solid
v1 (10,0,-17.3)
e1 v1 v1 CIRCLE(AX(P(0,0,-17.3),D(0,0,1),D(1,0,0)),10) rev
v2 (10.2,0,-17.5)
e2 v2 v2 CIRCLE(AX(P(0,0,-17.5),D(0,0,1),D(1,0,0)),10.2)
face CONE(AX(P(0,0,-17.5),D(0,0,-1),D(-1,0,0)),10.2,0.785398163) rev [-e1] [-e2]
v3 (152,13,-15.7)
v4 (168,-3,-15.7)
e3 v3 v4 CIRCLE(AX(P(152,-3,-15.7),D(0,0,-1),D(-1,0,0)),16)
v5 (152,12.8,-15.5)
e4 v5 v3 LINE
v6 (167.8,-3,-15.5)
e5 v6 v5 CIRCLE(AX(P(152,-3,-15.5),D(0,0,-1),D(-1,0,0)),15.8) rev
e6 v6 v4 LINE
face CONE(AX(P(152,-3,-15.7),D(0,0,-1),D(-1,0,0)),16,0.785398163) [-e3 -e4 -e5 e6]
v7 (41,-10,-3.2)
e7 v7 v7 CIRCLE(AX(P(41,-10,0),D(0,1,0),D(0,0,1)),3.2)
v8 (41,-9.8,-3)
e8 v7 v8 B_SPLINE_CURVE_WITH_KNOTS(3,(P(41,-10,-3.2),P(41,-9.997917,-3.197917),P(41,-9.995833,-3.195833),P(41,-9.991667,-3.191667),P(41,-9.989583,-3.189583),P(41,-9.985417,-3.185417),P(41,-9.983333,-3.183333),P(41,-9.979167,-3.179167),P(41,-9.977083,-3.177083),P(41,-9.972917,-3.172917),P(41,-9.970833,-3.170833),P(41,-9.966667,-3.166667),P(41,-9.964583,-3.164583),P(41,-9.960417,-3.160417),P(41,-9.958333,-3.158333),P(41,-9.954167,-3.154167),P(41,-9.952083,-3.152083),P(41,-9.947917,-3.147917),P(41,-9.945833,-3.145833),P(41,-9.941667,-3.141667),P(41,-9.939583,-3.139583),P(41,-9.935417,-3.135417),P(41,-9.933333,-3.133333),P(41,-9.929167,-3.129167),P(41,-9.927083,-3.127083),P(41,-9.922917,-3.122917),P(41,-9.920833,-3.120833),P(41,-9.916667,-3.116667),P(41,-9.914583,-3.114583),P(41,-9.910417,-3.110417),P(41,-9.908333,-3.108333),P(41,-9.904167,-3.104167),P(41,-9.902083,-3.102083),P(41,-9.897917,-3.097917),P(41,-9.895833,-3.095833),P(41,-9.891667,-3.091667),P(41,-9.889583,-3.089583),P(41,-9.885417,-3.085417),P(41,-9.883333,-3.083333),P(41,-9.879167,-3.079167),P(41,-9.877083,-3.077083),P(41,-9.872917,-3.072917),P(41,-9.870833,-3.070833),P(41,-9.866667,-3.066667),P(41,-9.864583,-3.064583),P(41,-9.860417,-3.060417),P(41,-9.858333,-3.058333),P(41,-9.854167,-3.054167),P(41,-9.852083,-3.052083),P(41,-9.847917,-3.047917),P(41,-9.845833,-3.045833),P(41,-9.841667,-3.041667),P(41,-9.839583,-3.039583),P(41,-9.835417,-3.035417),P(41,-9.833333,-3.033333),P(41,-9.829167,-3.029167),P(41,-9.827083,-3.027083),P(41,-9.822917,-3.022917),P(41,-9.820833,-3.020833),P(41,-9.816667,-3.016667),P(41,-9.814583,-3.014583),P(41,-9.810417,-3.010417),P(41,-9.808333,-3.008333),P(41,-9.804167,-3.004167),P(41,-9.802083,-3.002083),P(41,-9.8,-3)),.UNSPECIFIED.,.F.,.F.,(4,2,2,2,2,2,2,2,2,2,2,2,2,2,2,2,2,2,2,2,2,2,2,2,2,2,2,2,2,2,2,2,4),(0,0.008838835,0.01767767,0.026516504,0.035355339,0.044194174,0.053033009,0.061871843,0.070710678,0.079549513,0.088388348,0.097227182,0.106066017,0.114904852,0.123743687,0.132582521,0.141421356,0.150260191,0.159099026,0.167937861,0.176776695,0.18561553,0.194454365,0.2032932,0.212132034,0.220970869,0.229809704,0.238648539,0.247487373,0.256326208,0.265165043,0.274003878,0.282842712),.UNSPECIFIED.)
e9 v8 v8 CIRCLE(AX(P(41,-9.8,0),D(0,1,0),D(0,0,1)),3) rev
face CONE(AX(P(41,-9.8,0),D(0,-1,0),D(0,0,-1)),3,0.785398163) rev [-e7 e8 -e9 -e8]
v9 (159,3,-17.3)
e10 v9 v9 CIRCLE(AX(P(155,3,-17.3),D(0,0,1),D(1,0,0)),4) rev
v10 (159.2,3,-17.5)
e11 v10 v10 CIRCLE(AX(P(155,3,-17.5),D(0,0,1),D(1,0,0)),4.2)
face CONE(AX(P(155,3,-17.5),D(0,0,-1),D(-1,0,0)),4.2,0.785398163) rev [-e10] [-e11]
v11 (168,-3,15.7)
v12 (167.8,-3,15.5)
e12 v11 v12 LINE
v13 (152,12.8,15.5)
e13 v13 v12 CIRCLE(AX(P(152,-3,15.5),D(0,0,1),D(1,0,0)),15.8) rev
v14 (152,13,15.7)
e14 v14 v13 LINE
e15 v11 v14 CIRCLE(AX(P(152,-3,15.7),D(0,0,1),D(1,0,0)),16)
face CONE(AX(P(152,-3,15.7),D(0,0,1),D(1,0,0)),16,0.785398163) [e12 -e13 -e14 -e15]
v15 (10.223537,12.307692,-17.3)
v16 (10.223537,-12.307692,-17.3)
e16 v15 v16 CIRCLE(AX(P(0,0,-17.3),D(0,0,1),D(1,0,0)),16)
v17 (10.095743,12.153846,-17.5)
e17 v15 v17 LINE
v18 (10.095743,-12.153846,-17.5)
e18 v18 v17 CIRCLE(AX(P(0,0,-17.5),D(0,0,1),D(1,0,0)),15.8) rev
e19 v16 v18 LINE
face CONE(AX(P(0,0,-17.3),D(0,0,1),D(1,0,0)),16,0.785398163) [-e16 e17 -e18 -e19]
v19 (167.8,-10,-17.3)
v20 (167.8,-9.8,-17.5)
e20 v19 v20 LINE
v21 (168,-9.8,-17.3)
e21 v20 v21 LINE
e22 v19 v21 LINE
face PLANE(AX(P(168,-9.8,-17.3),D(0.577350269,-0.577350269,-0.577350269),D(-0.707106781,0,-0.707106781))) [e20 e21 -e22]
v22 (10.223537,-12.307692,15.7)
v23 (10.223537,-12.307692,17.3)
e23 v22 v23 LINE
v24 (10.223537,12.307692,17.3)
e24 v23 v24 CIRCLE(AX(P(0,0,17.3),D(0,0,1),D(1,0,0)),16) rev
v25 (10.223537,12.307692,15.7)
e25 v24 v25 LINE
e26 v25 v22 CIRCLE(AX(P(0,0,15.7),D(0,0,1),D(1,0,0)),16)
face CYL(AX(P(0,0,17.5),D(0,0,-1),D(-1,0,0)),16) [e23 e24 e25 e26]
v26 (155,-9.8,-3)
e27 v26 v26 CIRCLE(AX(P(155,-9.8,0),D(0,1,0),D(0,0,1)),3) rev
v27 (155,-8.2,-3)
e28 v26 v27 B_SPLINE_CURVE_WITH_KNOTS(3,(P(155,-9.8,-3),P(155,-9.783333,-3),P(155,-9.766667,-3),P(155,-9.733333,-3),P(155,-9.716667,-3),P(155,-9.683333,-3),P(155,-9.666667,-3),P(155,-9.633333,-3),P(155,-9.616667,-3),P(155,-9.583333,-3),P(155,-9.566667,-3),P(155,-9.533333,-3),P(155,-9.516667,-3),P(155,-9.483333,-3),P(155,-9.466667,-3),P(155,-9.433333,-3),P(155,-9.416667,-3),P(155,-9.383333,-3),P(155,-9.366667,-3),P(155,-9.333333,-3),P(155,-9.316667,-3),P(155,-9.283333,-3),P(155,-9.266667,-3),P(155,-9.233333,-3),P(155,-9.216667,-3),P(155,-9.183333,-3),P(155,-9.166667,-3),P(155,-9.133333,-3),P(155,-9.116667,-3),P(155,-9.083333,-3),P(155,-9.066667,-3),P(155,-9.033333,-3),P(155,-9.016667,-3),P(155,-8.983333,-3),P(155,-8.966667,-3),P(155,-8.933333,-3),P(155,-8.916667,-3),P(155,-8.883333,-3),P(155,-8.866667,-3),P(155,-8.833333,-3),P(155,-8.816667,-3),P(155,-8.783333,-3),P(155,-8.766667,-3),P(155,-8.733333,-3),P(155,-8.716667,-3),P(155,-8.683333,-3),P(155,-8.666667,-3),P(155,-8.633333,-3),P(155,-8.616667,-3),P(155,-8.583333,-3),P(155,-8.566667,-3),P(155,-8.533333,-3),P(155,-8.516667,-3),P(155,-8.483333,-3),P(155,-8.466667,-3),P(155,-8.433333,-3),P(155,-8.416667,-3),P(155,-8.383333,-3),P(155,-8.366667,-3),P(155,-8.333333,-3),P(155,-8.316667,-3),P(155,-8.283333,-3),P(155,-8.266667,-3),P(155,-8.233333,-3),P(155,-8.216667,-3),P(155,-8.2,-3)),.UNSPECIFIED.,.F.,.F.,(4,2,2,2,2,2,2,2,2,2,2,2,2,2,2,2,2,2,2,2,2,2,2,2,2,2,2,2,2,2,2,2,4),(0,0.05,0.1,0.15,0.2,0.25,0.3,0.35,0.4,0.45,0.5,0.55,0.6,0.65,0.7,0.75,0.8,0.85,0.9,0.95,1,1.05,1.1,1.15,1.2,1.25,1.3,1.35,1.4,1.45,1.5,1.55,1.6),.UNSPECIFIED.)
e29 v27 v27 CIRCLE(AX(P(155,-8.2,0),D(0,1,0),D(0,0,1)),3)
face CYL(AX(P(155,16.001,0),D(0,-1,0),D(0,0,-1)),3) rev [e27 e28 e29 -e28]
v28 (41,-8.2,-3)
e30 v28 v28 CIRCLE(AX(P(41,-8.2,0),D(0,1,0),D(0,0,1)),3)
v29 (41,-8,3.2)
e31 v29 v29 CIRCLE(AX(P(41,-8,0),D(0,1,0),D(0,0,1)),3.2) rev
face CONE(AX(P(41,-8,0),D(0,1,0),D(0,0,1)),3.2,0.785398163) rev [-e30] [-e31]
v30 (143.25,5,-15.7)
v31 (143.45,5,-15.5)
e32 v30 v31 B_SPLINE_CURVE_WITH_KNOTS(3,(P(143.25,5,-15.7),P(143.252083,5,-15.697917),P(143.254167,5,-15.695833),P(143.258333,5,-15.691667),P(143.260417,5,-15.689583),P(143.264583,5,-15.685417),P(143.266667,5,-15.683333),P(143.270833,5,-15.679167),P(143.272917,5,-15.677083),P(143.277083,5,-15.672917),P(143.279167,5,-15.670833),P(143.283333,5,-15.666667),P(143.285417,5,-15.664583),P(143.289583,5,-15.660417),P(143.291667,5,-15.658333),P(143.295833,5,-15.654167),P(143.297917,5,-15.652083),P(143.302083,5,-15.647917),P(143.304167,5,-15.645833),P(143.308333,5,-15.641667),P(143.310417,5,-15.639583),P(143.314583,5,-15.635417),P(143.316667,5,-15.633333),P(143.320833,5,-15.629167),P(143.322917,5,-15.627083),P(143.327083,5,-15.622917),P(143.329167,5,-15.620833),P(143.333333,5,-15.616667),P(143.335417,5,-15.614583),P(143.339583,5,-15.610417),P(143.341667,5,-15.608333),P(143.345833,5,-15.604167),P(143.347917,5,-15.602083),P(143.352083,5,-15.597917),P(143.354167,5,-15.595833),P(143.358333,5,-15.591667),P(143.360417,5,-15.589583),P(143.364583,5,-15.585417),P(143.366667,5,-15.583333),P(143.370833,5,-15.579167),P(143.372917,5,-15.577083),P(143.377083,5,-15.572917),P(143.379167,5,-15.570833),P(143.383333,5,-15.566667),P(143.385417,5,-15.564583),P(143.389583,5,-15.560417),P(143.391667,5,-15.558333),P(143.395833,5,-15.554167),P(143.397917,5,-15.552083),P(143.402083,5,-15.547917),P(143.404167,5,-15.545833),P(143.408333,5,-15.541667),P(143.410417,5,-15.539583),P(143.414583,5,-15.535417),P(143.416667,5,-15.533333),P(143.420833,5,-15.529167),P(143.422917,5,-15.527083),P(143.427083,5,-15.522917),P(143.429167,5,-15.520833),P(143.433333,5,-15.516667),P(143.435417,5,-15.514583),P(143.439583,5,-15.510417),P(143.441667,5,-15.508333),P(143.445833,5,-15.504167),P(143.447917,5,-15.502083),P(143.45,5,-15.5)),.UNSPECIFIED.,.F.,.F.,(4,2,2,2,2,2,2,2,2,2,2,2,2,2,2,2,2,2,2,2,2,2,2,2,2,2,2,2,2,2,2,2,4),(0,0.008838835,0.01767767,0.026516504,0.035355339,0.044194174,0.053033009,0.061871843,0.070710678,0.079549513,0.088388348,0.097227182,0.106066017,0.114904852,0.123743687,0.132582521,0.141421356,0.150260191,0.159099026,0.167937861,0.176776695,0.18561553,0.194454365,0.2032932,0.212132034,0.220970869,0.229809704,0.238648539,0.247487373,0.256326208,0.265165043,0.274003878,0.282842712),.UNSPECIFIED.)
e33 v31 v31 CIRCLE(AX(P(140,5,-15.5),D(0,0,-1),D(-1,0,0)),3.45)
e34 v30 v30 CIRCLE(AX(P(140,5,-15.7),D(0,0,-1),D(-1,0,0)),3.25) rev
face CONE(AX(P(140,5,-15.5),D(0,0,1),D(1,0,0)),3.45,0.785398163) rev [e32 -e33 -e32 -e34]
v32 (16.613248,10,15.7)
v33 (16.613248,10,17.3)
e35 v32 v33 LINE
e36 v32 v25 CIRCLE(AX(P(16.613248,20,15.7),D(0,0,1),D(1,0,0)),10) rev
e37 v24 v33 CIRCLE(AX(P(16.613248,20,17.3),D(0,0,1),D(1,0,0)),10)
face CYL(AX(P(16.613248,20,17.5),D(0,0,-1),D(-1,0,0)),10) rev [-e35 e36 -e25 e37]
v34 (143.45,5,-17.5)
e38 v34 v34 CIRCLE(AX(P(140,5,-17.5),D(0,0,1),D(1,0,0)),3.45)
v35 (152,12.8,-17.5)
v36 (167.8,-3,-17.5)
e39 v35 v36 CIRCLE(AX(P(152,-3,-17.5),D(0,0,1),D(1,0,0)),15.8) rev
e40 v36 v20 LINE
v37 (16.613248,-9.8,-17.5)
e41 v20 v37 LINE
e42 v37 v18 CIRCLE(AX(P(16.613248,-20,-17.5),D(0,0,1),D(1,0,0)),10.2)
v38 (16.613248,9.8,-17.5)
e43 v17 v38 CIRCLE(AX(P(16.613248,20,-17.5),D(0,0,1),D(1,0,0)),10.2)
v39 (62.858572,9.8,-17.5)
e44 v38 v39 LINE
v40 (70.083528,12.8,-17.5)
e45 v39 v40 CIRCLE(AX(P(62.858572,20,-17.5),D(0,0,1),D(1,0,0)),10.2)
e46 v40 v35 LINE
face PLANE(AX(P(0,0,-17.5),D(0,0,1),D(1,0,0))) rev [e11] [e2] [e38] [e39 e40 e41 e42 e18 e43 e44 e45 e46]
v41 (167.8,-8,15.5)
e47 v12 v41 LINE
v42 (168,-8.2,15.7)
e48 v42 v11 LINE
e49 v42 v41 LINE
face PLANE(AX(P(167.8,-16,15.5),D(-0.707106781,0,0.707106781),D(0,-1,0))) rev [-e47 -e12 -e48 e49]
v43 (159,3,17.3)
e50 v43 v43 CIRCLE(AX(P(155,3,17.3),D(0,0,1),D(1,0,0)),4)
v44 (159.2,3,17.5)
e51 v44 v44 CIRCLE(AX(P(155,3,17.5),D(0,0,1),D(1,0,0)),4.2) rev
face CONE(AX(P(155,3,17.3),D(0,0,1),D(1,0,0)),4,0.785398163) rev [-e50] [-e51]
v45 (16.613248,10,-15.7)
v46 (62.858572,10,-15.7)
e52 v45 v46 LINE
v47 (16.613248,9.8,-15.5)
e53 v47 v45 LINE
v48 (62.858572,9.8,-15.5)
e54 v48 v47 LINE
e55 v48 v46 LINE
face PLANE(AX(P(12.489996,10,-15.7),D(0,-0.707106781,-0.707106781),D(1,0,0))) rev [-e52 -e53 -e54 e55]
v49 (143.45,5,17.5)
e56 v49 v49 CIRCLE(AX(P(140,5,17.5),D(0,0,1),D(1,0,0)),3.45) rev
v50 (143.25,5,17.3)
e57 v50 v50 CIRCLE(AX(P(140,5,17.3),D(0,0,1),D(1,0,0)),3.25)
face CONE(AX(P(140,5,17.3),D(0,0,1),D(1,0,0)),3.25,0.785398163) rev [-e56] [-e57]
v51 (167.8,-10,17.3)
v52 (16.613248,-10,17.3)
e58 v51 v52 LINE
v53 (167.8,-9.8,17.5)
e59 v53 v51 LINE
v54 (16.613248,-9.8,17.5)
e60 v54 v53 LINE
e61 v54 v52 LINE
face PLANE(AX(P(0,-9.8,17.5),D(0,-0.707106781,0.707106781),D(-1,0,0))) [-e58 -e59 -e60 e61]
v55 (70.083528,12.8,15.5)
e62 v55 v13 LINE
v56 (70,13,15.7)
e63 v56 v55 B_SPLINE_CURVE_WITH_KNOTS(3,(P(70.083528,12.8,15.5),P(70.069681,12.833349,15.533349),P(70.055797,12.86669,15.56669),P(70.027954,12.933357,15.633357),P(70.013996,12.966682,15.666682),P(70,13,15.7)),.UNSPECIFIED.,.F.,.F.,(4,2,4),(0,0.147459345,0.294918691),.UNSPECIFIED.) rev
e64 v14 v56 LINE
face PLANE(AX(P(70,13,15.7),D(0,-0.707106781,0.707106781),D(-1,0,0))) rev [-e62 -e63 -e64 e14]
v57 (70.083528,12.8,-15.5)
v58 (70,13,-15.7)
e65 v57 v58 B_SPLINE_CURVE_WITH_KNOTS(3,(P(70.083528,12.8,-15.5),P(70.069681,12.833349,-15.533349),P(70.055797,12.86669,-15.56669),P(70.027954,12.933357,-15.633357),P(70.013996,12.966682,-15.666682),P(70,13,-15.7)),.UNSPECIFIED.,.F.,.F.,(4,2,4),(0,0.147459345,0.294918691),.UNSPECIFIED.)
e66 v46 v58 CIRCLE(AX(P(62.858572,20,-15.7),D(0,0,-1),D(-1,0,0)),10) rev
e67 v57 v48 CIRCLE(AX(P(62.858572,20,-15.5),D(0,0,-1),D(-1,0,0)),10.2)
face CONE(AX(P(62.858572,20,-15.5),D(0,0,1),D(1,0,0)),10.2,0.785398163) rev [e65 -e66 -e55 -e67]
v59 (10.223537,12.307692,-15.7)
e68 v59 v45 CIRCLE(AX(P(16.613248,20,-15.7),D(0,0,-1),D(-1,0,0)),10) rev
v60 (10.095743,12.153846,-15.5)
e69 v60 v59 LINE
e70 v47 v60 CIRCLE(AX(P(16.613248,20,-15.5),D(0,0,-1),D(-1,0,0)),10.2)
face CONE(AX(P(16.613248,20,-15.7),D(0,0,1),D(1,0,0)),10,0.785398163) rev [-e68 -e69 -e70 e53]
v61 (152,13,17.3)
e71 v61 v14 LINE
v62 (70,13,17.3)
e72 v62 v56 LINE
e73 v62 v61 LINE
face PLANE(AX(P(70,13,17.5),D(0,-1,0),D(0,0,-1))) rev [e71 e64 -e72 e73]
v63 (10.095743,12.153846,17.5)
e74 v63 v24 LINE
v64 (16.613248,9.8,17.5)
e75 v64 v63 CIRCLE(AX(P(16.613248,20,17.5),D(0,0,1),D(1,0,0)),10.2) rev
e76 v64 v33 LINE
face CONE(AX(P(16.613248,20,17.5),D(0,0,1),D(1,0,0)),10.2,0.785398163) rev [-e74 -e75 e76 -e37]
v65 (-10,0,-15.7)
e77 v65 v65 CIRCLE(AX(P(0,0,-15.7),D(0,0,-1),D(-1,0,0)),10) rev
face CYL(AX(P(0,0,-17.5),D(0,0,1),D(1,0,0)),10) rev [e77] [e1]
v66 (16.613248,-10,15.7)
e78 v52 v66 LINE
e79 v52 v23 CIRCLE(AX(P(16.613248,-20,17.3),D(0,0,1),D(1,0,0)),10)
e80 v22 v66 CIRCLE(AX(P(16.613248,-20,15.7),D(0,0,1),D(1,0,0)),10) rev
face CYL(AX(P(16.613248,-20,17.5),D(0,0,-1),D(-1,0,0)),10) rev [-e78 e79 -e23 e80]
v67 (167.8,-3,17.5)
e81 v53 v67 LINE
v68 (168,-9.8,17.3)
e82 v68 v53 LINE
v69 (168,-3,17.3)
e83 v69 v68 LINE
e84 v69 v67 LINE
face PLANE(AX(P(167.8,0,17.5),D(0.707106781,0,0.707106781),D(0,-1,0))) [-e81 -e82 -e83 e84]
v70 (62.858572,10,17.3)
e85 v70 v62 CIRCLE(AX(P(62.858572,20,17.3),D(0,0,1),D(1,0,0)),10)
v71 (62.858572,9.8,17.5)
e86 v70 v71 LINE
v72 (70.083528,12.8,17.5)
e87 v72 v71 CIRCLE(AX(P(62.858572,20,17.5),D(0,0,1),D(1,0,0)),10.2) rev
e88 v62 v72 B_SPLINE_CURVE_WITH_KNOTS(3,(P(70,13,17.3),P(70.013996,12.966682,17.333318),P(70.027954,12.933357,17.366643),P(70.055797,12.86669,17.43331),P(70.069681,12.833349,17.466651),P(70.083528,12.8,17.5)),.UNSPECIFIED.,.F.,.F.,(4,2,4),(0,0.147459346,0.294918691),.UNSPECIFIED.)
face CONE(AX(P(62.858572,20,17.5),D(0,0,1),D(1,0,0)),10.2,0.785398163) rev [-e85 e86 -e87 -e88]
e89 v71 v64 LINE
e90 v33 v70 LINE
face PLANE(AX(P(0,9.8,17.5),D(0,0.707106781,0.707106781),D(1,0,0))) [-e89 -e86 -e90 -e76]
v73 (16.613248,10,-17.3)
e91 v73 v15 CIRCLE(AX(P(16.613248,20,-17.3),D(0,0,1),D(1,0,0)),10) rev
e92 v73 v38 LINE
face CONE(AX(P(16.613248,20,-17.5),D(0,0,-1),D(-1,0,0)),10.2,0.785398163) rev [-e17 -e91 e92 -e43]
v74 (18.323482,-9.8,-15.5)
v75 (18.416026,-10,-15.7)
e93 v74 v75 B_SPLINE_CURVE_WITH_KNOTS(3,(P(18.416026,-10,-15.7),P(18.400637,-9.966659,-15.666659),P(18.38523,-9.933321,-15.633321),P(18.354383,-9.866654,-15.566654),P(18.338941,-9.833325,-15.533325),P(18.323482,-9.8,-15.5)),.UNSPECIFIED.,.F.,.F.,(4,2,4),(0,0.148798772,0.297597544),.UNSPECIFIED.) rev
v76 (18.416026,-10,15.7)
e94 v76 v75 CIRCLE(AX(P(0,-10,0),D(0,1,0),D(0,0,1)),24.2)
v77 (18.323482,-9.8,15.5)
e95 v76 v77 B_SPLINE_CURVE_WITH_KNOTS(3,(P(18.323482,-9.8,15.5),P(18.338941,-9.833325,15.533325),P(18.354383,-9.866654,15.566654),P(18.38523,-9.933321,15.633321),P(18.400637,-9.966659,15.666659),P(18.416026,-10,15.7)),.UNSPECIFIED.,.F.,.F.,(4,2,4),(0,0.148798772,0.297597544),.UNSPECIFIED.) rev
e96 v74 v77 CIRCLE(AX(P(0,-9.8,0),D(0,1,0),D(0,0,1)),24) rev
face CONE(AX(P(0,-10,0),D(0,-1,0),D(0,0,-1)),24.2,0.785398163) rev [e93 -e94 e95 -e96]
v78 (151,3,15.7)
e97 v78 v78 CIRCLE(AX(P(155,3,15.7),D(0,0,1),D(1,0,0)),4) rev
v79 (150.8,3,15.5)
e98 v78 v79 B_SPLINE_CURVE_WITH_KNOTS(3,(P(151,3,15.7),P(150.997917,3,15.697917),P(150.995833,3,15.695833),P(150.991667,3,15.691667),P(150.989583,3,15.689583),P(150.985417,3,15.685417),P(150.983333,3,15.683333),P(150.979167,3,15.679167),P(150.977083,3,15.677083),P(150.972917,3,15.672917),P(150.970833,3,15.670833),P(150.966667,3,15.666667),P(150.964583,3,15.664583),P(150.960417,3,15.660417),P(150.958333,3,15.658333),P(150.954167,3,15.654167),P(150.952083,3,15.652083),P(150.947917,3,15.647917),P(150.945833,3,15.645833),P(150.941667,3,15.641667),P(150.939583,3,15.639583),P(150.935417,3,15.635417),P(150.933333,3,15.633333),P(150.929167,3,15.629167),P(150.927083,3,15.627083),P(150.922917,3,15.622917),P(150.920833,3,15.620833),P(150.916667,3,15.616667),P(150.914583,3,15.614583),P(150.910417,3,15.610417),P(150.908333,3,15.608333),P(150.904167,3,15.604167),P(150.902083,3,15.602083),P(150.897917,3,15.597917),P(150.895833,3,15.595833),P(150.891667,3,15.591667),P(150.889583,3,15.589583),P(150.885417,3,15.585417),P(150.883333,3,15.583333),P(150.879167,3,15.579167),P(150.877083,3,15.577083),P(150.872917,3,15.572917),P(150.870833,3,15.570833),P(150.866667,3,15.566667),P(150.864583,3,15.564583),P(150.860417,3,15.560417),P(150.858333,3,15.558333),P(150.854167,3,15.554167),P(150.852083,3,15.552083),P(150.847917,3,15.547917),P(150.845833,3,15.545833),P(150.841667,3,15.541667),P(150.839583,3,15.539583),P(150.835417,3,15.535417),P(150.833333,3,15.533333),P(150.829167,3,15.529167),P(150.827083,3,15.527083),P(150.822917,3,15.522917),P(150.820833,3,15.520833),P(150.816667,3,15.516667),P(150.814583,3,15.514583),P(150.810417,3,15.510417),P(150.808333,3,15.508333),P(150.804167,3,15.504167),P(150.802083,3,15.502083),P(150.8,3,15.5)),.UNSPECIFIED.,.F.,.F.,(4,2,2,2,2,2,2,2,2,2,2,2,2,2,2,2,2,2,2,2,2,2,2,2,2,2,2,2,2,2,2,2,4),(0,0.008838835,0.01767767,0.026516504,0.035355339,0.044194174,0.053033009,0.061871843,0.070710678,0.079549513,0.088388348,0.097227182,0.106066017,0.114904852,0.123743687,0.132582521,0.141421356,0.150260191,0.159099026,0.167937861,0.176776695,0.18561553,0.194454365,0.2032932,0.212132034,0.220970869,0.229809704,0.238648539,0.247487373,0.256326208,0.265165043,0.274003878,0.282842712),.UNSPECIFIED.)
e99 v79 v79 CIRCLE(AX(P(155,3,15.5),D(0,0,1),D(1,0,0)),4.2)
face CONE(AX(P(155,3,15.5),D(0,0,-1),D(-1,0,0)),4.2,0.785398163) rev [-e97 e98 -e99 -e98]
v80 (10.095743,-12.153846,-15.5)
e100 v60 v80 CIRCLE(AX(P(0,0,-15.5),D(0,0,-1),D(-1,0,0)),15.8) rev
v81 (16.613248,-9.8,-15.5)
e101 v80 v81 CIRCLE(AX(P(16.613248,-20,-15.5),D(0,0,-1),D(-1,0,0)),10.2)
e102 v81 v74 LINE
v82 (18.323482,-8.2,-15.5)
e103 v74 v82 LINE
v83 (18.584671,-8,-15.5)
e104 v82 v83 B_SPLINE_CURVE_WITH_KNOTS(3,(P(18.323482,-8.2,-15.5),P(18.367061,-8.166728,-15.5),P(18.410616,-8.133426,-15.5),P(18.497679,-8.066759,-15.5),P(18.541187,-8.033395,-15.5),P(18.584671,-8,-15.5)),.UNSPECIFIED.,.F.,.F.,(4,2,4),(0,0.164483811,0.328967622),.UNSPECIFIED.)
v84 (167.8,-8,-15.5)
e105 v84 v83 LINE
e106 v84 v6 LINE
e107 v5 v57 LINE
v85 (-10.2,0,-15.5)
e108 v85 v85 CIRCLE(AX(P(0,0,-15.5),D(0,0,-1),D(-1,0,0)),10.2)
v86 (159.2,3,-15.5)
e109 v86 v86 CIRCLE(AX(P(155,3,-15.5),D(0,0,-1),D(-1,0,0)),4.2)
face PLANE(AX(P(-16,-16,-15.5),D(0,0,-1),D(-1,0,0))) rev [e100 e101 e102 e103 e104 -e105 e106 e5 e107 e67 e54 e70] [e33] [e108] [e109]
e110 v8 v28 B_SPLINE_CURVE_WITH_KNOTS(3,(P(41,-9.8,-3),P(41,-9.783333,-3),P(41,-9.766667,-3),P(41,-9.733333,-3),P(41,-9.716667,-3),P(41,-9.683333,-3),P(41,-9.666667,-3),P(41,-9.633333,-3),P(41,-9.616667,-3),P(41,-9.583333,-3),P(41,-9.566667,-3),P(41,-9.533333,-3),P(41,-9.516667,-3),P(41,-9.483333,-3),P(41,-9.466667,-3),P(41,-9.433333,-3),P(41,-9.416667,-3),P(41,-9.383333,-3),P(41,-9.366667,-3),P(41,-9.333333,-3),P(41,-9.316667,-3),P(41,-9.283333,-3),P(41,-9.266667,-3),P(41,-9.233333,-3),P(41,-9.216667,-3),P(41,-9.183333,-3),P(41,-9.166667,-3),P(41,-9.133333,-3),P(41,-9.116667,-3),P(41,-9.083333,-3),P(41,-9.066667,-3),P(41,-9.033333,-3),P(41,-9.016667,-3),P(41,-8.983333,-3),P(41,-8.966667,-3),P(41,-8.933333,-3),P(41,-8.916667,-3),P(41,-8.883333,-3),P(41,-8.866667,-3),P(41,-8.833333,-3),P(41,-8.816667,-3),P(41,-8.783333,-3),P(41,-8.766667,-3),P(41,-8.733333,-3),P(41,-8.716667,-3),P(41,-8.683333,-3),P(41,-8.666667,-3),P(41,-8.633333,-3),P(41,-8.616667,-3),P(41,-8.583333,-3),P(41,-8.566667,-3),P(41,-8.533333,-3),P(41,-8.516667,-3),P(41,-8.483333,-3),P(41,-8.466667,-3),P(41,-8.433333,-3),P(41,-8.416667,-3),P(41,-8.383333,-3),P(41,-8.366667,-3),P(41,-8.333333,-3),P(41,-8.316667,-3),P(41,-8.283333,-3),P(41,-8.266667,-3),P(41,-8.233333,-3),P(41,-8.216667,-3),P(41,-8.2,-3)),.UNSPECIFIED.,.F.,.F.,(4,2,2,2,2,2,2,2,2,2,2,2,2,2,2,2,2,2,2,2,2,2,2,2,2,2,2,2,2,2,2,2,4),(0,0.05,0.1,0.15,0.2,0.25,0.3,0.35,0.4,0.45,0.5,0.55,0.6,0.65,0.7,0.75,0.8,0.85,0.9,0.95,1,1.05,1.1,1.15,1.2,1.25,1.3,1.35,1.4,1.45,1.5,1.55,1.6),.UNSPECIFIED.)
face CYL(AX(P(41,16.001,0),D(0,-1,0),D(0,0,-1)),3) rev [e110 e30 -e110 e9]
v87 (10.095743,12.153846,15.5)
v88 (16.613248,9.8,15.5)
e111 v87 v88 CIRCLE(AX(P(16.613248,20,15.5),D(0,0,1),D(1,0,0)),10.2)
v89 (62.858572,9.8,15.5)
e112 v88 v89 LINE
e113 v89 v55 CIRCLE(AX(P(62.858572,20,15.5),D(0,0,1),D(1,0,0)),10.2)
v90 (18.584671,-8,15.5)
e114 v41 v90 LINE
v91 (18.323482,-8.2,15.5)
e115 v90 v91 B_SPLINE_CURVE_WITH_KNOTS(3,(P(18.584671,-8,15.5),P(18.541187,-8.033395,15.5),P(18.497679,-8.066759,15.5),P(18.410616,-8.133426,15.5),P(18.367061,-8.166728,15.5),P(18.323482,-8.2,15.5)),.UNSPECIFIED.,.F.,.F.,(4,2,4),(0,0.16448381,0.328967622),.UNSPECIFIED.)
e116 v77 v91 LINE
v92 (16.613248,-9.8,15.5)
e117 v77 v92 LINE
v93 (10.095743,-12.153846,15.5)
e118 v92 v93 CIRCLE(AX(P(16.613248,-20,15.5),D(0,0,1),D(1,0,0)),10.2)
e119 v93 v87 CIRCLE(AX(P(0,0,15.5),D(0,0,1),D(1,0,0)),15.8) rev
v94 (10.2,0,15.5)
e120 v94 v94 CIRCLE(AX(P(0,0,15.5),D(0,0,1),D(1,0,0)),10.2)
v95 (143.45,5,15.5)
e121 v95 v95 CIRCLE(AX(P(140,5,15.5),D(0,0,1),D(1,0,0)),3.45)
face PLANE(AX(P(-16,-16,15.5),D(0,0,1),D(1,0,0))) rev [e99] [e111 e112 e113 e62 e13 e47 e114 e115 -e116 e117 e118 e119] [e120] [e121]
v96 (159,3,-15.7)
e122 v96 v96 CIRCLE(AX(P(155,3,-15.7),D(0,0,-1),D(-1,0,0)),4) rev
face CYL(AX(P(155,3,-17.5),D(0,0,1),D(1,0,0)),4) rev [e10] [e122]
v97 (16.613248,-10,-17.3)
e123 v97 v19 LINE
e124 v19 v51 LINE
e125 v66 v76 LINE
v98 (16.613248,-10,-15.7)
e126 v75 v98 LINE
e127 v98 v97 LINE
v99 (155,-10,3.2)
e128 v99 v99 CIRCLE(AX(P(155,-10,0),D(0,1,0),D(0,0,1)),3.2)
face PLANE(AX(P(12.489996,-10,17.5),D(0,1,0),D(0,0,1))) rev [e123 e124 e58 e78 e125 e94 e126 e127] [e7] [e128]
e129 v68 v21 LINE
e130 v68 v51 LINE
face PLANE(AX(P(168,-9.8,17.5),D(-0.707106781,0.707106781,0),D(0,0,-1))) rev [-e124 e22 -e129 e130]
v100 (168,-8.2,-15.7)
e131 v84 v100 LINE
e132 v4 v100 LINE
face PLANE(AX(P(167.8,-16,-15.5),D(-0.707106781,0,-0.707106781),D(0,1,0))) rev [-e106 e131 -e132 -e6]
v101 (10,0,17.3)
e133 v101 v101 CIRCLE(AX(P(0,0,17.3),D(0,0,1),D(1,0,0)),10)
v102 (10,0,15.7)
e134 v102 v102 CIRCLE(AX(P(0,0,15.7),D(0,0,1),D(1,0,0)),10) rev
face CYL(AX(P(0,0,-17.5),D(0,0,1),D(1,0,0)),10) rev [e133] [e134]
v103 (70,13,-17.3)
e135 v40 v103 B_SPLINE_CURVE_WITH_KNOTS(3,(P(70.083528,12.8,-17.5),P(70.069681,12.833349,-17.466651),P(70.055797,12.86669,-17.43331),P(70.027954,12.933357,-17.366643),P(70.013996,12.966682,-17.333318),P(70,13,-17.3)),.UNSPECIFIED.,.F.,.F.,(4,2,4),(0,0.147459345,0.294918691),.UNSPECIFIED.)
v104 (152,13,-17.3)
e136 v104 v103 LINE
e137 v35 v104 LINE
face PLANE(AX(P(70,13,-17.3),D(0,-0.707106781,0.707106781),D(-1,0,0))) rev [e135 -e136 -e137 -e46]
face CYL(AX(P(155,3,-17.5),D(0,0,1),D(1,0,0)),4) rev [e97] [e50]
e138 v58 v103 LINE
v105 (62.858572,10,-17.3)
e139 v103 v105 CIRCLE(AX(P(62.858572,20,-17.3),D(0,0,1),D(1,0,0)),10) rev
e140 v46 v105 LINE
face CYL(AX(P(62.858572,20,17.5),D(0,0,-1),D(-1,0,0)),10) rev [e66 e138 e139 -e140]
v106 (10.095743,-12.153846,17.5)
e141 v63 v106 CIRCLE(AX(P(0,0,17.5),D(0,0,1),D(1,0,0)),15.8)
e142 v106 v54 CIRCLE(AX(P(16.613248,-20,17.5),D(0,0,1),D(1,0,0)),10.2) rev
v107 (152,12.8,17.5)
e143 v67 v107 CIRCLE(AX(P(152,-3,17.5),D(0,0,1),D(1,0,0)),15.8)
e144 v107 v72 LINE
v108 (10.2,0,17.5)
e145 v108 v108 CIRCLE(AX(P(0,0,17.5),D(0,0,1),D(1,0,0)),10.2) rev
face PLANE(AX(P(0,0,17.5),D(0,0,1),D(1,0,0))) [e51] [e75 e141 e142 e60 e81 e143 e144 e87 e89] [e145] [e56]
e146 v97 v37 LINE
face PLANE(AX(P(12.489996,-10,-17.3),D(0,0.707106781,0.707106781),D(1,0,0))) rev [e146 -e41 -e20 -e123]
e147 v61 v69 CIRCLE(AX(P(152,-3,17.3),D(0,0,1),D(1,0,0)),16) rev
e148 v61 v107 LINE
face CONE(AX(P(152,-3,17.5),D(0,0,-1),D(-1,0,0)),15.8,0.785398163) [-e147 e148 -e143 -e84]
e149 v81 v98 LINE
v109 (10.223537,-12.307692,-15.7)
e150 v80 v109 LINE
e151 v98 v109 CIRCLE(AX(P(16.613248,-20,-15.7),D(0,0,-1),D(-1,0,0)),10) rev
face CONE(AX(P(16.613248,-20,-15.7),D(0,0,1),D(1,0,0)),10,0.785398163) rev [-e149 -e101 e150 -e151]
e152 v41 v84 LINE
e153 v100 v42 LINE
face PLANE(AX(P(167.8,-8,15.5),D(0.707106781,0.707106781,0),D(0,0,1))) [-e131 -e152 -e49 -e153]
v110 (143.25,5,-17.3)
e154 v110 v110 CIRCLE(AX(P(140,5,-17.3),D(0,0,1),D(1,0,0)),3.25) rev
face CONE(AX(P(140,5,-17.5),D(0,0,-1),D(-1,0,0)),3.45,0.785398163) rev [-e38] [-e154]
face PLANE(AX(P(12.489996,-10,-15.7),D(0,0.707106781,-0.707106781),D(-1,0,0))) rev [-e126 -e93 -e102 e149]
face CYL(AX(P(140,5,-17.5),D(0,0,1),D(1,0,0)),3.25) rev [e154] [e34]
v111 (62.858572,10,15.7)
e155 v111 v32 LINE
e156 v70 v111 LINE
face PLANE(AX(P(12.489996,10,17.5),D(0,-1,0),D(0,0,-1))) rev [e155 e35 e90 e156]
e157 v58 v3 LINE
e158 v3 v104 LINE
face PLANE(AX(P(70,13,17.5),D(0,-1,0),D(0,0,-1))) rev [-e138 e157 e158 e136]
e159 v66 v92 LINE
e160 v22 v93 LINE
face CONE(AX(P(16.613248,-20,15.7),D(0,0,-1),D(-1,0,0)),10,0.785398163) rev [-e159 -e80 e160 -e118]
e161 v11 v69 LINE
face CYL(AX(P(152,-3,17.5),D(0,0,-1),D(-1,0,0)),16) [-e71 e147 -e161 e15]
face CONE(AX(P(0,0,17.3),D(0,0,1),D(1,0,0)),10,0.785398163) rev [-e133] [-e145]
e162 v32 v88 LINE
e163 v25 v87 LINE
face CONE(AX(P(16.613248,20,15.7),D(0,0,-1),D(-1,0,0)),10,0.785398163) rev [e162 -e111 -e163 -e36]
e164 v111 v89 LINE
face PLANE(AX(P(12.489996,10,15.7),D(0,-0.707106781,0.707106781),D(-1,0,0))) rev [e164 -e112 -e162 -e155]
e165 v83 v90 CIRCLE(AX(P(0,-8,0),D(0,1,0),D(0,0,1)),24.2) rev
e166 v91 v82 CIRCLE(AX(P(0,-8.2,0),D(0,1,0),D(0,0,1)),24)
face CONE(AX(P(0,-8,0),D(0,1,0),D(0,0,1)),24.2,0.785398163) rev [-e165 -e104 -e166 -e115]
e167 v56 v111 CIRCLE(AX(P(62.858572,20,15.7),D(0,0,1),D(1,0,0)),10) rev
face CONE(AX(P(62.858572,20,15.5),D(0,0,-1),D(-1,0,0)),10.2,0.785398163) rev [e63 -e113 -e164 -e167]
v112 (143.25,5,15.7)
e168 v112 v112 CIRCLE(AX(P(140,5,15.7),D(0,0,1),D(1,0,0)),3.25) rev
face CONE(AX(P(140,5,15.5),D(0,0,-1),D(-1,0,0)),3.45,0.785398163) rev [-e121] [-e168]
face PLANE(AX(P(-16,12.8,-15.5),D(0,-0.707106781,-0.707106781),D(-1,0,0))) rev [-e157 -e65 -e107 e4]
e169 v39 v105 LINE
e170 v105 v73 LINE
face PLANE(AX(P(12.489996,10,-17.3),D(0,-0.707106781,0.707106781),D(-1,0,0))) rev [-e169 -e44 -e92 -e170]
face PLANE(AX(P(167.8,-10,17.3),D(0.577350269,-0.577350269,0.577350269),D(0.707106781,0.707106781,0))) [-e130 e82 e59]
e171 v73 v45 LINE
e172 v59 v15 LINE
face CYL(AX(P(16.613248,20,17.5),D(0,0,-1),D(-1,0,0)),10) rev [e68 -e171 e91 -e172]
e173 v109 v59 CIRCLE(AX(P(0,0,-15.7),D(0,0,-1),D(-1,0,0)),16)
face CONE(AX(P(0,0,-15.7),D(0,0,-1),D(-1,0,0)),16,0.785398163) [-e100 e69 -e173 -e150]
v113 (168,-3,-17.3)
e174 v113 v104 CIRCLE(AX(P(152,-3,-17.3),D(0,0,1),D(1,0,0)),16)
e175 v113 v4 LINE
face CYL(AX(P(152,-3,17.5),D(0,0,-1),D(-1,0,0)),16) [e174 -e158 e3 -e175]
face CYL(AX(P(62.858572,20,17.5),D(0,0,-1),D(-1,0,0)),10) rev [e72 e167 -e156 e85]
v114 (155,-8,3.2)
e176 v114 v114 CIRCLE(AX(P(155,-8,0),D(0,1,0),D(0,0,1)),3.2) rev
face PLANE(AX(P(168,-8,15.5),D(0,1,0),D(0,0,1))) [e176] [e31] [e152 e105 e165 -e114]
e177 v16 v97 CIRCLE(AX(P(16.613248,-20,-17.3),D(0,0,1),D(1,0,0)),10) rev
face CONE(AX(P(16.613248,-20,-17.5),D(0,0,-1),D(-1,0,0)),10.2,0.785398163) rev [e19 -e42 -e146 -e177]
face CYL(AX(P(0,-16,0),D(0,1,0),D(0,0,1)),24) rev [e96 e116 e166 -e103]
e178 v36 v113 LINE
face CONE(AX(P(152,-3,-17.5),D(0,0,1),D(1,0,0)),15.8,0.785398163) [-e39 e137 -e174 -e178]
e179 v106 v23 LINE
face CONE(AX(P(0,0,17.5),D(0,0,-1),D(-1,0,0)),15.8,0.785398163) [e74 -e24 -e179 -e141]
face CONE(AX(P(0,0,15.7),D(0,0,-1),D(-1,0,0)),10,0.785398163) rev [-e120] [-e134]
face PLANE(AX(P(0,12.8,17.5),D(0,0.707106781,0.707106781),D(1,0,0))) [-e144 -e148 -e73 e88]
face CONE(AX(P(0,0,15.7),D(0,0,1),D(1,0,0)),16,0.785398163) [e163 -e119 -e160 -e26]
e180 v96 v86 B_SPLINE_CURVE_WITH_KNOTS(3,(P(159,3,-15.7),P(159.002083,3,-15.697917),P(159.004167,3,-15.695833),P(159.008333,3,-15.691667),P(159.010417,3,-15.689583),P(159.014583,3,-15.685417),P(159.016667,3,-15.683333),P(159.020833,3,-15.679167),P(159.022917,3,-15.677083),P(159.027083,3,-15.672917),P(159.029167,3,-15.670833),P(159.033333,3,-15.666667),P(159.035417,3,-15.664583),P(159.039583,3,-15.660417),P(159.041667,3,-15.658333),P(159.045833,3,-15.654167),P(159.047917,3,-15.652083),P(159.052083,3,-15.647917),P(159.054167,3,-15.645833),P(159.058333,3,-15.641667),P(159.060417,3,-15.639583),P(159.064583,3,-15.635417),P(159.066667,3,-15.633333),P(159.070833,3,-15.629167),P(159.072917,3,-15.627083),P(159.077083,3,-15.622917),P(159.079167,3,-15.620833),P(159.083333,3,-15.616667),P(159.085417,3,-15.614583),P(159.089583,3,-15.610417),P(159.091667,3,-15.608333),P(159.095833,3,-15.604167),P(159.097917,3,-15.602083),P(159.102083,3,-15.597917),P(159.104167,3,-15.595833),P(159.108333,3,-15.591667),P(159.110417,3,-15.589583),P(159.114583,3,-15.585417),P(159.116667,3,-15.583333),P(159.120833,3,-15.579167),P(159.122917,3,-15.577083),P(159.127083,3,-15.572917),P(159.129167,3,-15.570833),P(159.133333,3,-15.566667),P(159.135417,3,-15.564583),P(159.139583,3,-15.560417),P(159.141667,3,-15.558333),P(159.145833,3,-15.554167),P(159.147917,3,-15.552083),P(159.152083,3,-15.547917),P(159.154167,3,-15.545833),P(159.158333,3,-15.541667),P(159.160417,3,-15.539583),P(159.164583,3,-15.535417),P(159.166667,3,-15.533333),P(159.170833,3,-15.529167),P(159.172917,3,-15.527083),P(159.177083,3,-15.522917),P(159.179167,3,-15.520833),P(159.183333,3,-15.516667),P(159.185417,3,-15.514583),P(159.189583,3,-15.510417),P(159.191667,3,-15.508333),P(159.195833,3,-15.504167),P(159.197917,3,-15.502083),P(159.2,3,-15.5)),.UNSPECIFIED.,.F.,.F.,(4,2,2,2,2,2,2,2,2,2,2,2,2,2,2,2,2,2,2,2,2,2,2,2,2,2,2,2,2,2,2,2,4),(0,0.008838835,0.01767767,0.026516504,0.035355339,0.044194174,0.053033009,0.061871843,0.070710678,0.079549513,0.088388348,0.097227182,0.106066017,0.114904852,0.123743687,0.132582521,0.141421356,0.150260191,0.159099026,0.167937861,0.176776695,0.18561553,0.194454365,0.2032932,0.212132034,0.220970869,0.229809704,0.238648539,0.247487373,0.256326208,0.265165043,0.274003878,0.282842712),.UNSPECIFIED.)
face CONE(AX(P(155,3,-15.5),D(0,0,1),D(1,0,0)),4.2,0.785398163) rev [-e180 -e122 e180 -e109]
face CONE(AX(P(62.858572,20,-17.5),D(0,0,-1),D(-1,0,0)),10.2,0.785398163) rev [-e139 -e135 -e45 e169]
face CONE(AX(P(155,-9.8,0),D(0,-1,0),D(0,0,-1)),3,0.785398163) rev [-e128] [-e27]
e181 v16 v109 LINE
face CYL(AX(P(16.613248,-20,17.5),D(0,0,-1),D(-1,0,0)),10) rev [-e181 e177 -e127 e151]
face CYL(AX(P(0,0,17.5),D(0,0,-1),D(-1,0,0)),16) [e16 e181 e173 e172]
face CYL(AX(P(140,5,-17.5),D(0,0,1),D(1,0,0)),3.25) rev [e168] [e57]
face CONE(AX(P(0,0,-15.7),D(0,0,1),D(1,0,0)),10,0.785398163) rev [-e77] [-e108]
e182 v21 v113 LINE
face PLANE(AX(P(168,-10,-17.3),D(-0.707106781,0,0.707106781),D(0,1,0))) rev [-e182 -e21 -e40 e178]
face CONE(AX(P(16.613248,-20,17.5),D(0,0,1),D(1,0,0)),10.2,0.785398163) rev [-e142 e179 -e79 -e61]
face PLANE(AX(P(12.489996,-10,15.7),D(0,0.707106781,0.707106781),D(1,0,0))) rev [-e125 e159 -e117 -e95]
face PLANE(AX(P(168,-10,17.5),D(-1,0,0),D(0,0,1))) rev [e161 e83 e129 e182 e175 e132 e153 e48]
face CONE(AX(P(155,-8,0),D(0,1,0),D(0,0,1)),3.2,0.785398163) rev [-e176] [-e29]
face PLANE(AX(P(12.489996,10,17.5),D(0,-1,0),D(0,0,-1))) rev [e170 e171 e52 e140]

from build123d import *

# Parameters (mm, degrees)
ARMA_W_DEPTH             = 17.5
FILLET_1_R               = 16
FILLET_2_R               = 10
SKETCH_2_R               = 10
CUT_EXTRUDE_1_DEPTH      = 173.351385257
CUT_EXTRUDE_2_DEPTH      = 170.665111322
CUT_EXTRUDE_2_DEPTH_BACK = 170.665111322
ARMA_T_W                 = 31
ARMA_T_H                 = 21
CUT_EXTRUDE_3_DEPTH      = 170.665111322
SKETCH_5_R               = 4
SKETCH_5_R_2             = 3.25
CUT_EXTRUDE_4_DEPTH      = 173.351385257
CUT_EXTRUDE_5_REACH      = 172.898
SKETCH_6_R               = 3
CHAMFER_1_SIZE           = 0.2


with BuildPart() as part:
    # ArmA-L → ArmA-W (new, symmetric)
    with BuildSketch(Plane.XY):
        with BuildLine():
            Line((12.489995997, 10), (70, 10))
            Line((70, 10), (70, 13))
            Line((70, 13), (168, 13))
            Line((168, 13), (168, -10))
            Line((168, -10), (12.489995997, -10))
            ThreePointArc((12.489995997, -10), (-16, 0), (12.489995997, 10))
        make_face()
    extrude(amount=ARMA_W_DEPTH, both=True)

    # ﾌｨﾚｯﾄ1
    fillet_1_edges = [part.edges().sort_by_distance(p)[0] for p in [
        (168, 13, 0),
    ]]
    fillet(fillet_1_edges, radius=FILLET_1_R)

    # ﾌｨﾚｯﾄ2
    # the kernel refuses this fillet: 10 mm, written as the material it adds along each edge
    with BuildSketch(Plane(origin=(12.489995997, -10, -17.5), x_dir=(1, 0, 0), z_dir=(0, 0, 1))) as fillet_2_piece_1:
        with BuildLine():
            CenterArc((4.123251729, -10), FILLET_2_R, 90, 39.715137232)
            Line((-2.266458935, -2.307692308), (-2.394253148, -2.153846154))
            ThreePointArc((-2.394253148, -2.153846154), (-1.217455031, -1.071125515), (-0.15612495, 0.125))
            Line((-0.15612495, 0.125), (0, 0.2))
            Line((0, 0.2), (4.123251729, 0.2))
            Line((4.123251729, 0.2), (4.123251729, 0))
        make_face()
    extrude(amount=35)
    with BuildSketch(Plane(origin=(12.489995997, 10, -17.5), x_dir=(1, 0, 0), z_dir=(0, 0, 1))) as fillet_2_piece_2:
        with BuildLine():
            CenterArc((4.123251729, 10), FILLET_2_R, 230.284862768, 39.715137232)
            Line((-2.266458935, 2.307692308), (-2.394253148, 2.153846154))
            ThreePointArc((-2.394253148, 2.153846154), (-1.217455031, 1.071125515), (-0.15612495, -0.125))
            Line((-0.15612495, -0.125), (0, -0.2))
            Line((0, -0.2), (4.123251729, -0.2))
            Line((4.123251729, -0.2), (4.123251729, 0))
        make_face()
    extrude(amount=35)
    with BuildSketch(Plane(origin=(70, 10, 17.5), x_dir=(0, 1, 0), z_dir=(0, 0, -1))) as fillet_2_piece_3:
        with BuildLine():
            CenterArc((10, -7.141428429), FILLET_2_R, 134.427004001, 45.572995999)
            Line((0, -7.141428429), (-0.2, -7.141428429))
            Line((-0.2, -7.141428429), (-0.2, 0))
            Line((-0.2, 0), (0, 0.2))
            ThreePointArc((0, 0.2), (1.5, 0.2), (2.86, 0.142828569))
            Line((2.86, 0.142828569), (3, 0))
        make_face()
    extrude(amount=35)

    # ｽｹｯﾁ2 → ｶｯﾄ - 押し出し1 (cut, through all)
    with BuildSketch(Plane.XY.offset(17.5)):
        Circle(SKETCH_2_R)
    extrude(amount=-CUT_EXTRUDE_1_DEPTH, mode=Mode.SUBTRACT)

    # ｽｹｯﾁ3 → ｶｯﾄ - 押し出し2 (cut, two sides: drawn at the far end of the back side and taken through both)
    with BuildSketch(Plane(origin=(0, 0, 0), x_dir=(1, 0, 0), z_dir=(0, 1, 0)).offset(-CUT_EXTRUDE_2_DEPTH_BACK)):
        with BuildLine():
            Line((-16, 15.5), (-16, -15.5))
            Line((-16, -15.5), (18.323482202, -15.5))
            ThreePointArc((18.323482202, -15.5), (24, 0), (18.323482202, 15.5))
            Line((18.323482202, 15.5), (-16, 15.5))
        make_face()
    extrude(amount=CUT_EXTRUDE_2_DEPTH + CUT_EXTRUDE_2_DEPTH_BACK, mode=Mode.SUBTRACT)

    # ArmA-t → ｶｯﾄ - 押し出し3 (cut, through all)
    with BuildSketch(Plane(origin=(0, 0, 0), x_dir=(0, 0, -1), z_dir=(1, 0, 0))):
        with Locations((0, 2.5)):
            Rectangle(ARMA_T_W, ARMA_T_H)
    extrude(amount=CUT_EXTRUDE_3_DEPTH, mode=Mode.SUBTRACT)

    # ｽｹｯﾁ5 → ｶｯﾄ - 押し出し4 (cut, through all)
    with BuildSketch(Plane.XY.offset(17.5)):
        with Locations((155, 3)):
            Circle(SKETCH_5_R)
        with Locations((140, 5)):
            Circle(SKETCH_5_R_2)
    extrude(amount=-CUT_EXTRUDE_4_DEPTH, mode=Mode.SUBTRACT)

    # ｽｹｯﾁ6 → ｶｯﾄ - 押し出し5 (cut, up to next)
    with BuildSketch(Plane.XZ.offset(10), mode=Mode.PRIVATE) as cut_extrude_5_sk1:
        with Locations(Location((155, 0, 0), (0, 0, 270))):
            Circle(SKETCH_6_R)
    cut_extrude_5_tool1 = extrude(cut_extrude_5_sk1.sketch, amount=-CUT_EXTRUDE_5_REACH, mode=Mode.PRIVATE) & part.part
    # ｽｹｯﾁ6 → ｶｯﾄ - 押し出し5 (cut, up to next)
    with BuildSketch(Plane.XZ.offset(10), mode=Mode.PRIVATE) as cut_extrude_5_sk2:
        with Locations(Location((41, 0, 0), (0, 0, 270))):
            Circle(SKETCH_6_R)
    cut_extrude_5_tool2 = extrude(cut_extrude_5_sk2.sketch, amount=-CUT_EXTRUDE_5_REACH, mode=Mode.PRIVATE) & part.part
    add(cut_extrude_5_tool1.solids().sort_by_distance((155, -10, 0))[0], mode=Mode.SUBTRACT)
    add(cut_extrude_5_tool2.solids().sort_by_distance((41, -10, 0))[0], mode=Mode.SUBTRACT)

    # 面取り1
    chamfer_1_edges = [part.edges().sort_by_distance(p)[0] for p in [
        (168, -6.5, 17.5),
        (163.313708499, 8.313708499, -15.5),
        (111, 13, -15.5),
        (24, -8, 0),
        (66.731554918, 10.780455543, -15.5),
        (168, -5.5, -15.5),
        (168, -5.5, 15.5),
        (168, -8, 0),
        (168, -10, 0),
        (151, 3, -17.5),
        (151, 3, -15.5),
        (151, 3, 15.5),
        (151, 3, 17.5),
        (136.75, 5, -17.5),
        (136.75, 5, -15.5),
        (136.75, 5, 15.5),
        (136.75, 5, 17.5),
        (155, -8, 3),
        (155, -10, 3),
        (41, -8, 3),
        (41, -10, 3),
        (111, 13, -17.5),
        (111, 13, 17.5),
        (163.313708499, 8.313708499, -17.5),
        (163.313708499, 8.313708499, 17.5),
        (39.735909649, 10, -17.5),
        (39.735909649, 10, 17.5),
        (92.306623863, -10, -17.5),
        (92.306623863, -10, 17.5),
        (-16, 0, -17.5),
        (-16, 0, 17.5),
        (66.731554918, 10.780455543, -17.5),
        (66.731554918, 10.780455543, 17.5),
        (13.216416623, -10.594600569, -17.5),
        (13.216416623, -10.594600569, 17.5),
        (13.216416623, 10.594600569, -17.5),
        (13.216416623, 10.594600569, 17.5),
        (-10, 0, -17.5),
        (-10, 0, 17.5),
        (24, -10, 0),
        (-10, 0, -15.5),
        (17.468364964, -10, -15.5),
        (13.216416623, -10.594600569, -15.5),
        (-16, 0, -15.5),
        (13.216416623, 10.594600569, -15.5),
        (39.735909649, 10, -15.5),
        (-10, 0, 15.5),
        (13.216416623, -10.594600569, 15.5),
        (17.468364964, -10, 15.5),
        (39.735909649, 10, 15.5),
        (13.216416623, 10.594600569, 15.5),
        (-16, 0, 15.5),
        (168, -6.5, -17.5),
        (66.731554918, 10.780455543, 15.5),
        (163.313708499, 8.313708499, 15.5),
        (111, 13, 15.5),
    ]]
    chamfer(chamfer_1_edges, length=CHAMFER_1_SIZE)


solid = part.part
